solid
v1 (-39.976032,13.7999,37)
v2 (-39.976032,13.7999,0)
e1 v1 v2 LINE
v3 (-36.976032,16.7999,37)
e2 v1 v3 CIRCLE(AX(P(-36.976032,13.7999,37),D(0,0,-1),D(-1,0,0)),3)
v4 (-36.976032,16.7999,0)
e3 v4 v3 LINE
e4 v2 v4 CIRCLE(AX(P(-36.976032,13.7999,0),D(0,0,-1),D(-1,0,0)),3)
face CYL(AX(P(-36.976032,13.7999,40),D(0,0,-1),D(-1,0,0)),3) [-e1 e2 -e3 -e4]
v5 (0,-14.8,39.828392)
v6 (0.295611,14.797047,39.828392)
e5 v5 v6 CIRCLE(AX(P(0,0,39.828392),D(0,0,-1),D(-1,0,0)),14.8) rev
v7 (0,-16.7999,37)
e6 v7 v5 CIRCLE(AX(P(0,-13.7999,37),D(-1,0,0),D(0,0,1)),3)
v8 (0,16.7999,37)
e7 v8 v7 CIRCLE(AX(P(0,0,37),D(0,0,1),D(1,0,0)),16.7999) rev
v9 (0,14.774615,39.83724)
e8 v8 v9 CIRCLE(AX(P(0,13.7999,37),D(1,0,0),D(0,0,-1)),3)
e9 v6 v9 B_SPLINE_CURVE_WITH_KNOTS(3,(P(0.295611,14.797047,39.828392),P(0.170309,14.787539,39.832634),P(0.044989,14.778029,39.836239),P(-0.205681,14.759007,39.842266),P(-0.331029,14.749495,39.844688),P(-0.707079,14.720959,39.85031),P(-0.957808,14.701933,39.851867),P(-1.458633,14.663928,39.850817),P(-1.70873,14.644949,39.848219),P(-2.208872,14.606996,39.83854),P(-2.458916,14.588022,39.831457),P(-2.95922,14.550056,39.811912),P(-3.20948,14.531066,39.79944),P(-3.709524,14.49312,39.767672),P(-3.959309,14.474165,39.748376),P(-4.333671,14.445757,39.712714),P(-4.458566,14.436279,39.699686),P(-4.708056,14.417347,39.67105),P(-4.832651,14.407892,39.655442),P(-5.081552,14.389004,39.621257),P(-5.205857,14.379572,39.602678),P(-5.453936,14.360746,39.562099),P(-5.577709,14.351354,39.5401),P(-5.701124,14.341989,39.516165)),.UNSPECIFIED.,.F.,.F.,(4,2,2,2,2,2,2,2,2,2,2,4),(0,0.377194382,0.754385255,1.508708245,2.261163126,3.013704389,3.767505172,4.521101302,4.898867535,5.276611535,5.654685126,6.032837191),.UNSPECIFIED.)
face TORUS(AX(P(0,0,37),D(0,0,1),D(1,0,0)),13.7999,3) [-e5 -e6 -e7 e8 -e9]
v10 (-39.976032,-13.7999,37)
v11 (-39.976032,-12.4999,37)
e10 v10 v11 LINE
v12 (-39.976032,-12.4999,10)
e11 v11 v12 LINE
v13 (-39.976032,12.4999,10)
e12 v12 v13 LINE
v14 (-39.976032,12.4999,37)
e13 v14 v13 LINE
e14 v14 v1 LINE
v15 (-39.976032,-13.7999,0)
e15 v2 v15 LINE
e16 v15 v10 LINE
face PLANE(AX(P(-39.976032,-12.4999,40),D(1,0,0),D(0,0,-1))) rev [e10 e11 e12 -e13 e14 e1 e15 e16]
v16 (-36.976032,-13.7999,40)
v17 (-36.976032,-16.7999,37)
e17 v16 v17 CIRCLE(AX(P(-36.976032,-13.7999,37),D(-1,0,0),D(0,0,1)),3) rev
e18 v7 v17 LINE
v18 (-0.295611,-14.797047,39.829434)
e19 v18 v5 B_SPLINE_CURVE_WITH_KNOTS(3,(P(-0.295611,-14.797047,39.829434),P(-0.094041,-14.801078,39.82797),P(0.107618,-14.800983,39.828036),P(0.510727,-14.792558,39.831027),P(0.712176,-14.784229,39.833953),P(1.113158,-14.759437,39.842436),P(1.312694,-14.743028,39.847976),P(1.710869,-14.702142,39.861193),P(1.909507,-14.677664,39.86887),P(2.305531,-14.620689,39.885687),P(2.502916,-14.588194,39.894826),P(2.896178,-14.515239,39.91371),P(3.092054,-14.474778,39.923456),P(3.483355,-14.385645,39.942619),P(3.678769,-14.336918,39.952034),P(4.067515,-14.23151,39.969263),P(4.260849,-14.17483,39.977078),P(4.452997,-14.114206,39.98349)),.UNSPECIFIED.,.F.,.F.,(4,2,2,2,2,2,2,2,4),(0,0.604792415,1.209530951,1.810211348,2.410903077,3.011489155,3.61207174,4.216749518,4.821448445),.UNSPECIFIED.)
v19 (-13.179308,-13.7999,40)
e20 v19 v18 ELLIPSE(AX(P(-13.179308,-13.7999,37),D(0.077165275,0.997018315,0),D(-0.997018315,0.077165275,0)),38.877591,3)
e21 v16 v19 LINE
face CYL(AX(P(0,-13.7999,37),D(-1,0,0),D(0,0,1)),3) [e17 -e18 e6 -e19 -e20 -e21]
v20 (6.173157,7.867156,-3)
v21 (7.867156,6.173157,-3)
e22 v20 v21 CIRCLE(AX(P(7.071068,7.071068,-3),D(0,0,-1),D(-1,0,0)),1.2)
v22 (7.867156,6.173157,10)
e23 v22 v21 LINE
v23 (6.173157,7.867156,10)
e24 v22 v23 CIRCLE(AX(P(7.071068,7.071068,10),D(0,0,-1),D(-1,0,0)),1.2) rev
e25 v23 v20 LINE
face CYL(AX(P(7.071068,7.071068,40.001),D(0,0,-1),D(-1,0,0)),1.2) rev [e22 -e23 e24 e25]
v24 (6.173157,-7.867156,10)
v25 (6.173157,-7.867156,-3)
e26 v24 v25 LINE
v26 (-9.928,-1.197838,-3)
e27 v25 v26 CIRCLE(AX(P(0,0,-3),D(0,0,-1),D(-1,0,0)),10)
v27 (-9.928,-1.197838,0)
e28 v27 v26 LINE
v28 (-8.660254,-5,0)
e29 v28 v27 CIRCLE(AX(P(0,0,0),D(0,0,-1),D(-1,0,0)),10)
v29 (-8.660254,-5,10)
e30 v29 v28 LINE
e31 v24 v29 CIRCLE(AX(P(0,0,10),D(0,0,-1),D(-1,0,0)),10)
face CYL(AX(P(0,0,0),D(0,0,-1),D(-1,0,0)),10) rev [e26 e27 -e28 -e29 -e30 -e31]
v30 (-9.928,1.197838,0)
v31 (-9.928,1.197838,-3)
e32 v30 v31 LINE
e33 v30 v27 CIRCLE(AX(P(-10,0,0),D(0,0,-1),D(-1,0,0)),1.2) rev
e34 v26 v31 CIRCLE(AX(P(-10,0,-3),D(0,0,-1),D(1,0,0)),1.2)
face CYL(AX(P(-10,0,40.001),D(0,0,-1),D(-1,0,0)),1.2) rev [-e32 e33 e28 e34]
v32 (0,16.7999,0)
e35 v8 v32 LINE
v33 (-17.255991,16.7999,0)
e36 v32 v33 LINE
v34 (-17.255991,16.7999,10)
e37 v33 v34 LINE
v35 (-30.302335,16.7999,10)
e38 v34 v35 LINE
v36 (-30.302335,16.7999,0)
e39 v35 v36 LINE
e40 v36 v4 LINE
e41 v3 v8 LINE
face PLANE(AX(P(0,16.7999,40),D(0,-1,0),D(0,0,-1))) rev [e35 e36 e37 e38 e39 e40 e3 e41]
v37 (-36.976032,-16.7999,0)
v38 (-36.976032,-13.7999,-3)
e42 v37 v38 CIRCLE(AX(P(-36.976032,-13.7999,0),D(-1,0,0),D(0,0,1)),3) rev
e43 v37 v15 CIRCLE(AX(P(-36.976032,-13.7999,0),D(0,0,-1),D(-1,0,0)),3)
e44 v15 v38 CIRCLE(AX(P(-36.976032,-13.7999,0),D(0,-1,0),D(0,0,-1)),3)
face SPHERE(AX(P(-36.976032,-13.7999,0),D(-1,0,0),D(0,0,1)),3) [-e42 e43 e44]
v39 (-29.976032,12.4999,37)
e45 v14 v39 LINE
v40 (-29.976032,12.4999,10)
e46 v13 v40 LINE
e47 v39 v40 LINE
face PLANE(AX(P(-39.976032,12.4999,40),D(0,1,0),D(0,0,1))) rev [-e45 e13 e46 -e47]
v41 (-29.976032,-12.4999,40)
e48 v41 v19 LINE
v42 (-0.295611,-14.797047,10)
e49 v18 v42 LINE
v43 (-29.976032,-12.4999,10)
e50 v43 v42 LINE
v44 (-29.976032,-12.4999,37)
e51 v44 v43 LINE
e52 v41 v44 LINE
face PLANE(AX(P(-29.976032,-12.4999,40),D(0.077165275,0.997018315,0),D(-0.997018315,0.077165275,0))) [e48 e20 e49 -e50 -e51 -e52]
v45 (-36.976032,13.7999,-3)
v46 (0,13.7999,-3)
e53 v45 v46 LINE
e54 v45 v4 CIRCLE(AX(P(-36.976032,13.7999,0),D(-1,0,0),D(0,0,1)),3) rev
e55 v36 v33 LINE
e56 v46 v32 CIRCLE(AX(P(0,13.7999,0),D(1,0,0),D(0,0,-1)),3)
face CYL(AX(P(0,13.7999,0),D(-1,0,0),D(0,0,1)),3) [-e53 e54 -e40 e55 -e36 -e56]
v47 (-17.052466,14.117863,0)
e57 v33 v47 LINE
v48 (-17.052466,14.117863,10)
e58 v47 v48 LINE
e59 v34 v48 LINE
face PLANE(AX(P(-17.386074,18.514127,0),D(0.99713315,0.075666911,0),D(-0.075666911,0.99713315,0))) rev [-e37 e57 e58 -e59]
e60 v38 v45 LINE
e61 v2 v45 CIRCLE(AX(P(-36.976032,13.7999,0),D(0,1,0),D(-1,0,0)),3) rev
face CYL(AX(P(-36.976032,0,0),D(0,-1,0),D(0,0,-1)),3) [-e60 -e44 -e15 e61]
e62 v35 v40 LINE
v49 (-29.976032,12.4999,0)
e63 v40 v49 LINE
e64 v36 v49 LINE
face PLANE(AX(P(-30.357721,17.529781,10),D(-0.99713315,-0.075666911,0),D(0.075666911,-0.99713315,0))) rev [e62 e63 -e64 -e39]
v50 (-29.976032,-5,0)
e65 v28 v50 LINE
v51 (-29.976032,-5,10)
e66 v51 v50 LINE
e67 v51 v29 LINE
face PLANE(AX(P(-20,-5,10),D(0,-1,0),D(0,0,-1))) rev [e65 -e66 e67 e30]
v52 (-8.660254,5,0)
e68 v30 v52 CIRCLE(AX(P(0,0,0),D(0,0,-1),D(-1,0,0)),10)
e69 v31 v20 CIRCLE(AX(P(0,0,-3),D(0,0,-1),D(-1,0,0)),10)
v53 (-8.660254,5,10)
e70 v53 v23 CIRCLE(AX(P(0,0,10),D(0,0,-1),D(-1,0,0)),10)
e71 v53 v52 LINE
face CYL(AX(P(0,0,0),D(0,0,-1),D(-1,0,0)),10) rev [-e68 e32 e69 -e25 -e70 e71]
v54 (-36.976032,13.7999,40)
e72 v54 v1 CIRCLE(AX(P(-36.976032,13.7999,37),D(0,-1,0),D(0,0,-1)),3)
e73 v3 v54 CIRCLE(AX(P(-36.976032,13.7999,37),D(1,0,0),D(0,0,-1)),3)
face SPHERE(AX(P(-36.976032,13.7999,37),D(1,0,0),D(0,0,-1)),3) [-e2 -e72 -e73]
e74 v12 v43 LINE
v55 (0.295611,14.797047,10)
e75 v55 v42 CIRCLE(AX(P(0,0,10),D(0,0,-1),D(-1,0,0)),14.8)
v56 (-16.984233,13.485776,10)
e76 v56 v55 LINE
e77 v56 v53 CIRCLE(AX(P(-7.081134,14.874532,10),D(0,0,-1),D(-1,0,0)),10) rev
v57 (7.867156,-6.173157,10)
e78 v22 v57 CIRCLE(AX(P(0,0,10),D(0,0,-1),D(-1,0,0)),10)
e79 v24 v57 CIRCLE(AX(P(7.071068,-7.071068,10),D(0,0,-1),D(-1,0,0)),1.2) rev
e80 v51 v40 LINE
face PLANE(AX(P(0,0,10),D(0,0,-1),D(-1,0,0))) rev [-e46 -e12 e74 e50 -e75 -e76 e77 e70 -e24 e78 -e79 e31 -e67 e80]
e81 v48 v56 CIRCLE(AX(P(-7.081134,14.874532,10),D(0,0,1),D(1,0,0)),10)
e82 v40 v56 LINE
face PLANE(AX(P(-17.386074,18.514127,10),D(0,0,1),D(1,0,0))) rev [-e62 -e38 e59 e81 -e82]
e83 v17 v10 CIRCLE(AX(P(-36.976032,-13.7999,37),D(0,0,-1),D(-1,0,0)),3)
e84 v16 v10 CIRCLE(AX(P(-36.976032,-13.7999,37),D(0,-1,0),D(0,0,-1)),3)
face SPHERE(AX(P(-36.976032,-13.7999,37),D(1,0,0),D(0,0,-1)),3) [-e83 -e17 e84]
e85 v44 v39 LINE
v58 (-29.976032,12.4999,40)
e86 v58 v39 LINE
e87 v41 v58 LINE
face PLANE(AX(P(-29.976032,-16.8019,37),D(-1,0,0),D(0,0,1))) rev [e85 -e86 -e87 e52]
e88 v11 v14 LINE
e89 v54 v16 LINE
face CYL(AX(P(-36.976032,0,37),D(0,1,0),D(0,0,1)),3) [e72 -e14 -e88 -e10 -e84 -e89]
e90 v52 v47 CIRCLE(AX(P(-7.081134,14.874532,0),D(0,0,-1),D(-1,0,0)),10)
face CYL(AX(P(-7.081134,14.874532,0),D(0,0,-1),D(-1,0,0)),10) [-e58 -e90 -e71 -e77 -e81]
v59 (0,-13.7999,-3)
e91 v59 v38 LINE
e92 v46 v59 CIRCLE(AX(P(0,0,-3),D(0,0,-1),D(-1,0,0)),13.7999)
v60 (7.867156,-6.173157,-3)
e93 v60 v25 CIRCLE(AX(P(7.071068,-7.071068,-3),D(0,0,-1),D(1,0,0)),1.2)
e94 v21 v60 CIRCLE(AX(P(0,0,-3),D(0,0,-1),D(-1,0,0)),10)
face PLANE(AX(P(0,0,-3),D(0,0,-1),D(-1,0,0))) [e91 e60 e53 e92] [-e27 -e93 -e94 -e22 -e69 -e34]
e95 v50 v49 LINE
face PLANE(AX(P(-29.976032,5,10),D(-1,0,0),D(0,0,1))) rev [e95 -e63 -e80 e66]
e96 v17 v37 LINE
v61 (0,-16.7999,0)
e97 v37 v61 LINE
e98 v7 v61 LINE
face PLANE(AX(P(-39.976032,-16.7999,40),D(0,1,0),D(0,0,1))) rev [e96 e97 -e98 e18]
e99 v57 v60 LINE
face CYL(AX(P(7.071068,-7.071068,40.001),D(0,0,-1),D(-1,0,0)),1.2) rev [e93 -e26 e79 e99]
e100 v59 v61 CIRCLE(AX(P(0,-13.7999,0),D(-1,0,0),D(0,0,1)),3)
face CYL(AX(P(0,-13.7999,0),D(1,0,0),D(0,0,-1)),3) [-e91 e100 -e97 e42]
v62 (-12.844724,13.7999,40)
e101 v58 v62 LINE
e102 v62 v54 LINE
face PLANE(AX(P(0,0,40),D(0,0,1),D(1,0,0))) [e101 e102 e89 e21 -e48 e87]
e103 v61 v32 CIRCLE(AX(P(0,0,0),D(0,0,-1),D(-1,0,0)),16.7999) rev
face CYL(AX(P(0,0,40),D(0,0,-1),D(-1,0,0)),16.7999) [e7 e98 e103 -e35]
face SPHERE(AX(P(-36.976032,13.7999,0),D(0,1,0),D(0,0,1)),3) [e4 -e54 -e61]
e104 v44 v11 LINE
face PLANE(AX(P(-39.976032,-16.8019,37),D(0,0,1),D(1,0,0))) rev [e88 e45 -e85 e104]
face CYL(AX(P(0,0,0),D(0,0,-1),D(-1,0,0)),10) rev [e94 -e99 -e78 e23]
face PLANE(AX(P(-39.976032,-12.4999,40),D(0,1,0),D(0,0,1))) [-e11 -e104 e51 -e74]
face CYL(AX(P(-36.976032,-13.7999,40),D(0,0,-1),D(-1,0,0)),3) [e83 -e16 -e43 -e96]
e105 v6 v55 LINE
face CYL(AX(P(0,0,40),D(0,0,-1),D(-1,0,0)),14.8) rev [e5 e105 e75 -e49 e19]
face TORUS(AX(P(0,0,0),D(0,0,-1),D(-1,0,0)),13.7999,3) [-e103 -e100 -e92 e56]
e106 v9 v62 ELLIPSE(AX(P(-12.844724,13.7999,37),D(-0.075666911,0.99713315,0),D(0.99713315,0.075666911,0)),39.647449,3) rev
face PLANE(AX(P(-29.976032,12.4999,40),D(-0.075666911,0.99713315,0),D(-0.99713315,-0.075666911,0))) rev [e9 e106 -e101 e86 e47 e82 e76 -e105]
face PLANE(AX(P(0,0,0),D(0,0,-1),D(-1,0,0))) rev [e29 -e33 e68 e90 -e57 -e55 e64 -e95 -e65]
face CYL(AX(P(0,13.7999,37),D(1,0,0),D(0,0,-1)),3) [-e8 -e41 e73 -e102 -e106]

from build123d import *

# Parameters (mm, degrees)
EXTRUDE_9_DEPTH      = 40
EXTRUDE_START        = 3
EXTRUDE_10_DEPTH     = 3
SKETCH_11_R          = 10
CUT_EXTRUDE_1_DEPTH  = 3
EXTRUDE_11_DEPTH     = 10
SKETCH_21_W          = 13.008941923
SKETCH_21_H          = 10
CUT_EXTRUDE_9_DEPTH  = 65.045413014
EXTRUDE_12_REACH     = 65.691
SKETCH_23_W          = 10
SKETCH_23_H          = 3
FILLET_1_R           = 3
FILLET_2_R           = 3
FILLET_3_DEPTH       = 10
CUT_EXTRUDE_10_REACH = 63.068


with BuildPart() as part:
    # 草图5 → 凸台-拉伸9 (new body)
    with BuildSketch(Plane.XY):
        with BuildLine():
            Line((0, 16.799900253), (-39.976031579, 16.799900253))
            Line((-39.976031579, 16.799900253), (-39.976031579, 12.499900253))
            Line((-39.976031579, 12.499900253), (-29.976031579, 12.499900253))
            Line((-29.976031579, 12.499900253), (0.295610531, 14.79704749))
            ThreePointArc((0.295610531, 14.79704749), (14.79704749, -0.295610531), (-0.295610531, -14.79704749))
            Line((-0.295610531, -14.79704749), (-29.976031579, -12.499900253))
            Line((-29.976031579, -12.499900253), (-39.976031579, -12.499900253))
            Line((-39.976031579, -12.499900253), (-39.976031579, -16.799900253))
            Line((-39.976031579, -16.799900253), (0, -16.799900253))
            ThreePointArc((0, -16.799900253), (16.799900253, 0), (0, 16.799900253))
        make_face()
    extrude(amount=EXTRUDE_9_DEPTH)

    # 草图10 → 凸台-拉伸10 (add)
    with BuildSketch(Plane(origin=(0, 0, 0), x_dir=(-1, 0, 0), z_dir=(0, 0, -1)).offset(EXTRUDE_START)):
        with BuildLine():
            Line((0, -16.799900253), (39.976031579, -16.799900253))
            Line((39.976031579, -16.799900253), (39.976031579, 16.799900253))
            Line((39.976031579, 16.799900253), (0, 16.799900253))
            ThreePointArc((0, 16.799900253), (-16.799900253, 0), (0, -16.799900253))
        make_face()
    extrude(amount=-EXTRUDE_10_DEPTH)

    # 草图11 → 切除-拉伸1 (cut)
    with BuildSketch(Plane(origin=(0, 0, -3), x_dir=(-1, 0, 0), z_dir=(0, 0, -1))):
        Circle(SKETCH_11_R)
    extrude(amount=-CUT_EXTRUDE_1_DEPTH, mode=Mode.SUBTRACT)

    # 草图18 → 凸台-拉伸11 (add)
    with BuildSketch(Plane.XY):
        with BuildLine():
            Line((-39.976031579, -12.499900253), (-29.976031579, -12.499900253))
            Line((-29.976031579, -12.499900253), (-20.032968003, -13.26945406))
            Line((-20.032968003, -13.26945406), (-0.295610531, -14.79704749))
            ThreePointArc((-0.295610531, -14.79704749), (14.79704749, -0.295610531), (0.295610531, 14.79704749))
            Line((0.295610531, 14.79704749), (-17.004384343, 13.484246708))
            Line((-17.004384343, 13.484246708), (-17.004384343, 5))
            Line((-17.004384343, 5), (-8.660254038, 5))
            ThreePointArc((-8.660254038, 5), (10, 0), (-8.660254038, -5))
            Line((-8.660254038, -5), (-20, -5))
            Line((-20, -5), (-29.976031579, -5))
            Line((-29.976031579, -5), (-29.976031579, 5))
            Line((-29.976031579, 5), (-29.976031579, 12.499900253))
            Line((-29.976031579, 12.499900253), (-39.976031579, 12.499900253))
            Line((-39.976031579, 12.499900253), (-39.976031579, -12.499900253))
        make_face()
    extrude(amount=EXTRUDE_11_DEPTH)

    # 草图21 → 切除-拉伸9 (cut, through all)
    with BuildSketch(Plane(origin=(-1.114744508, 14.690023458, 0), x_dir=(0.9971331498487674, 0.07566691134621262, 0), z_dir=(0.07566691134621262, -0.9971331498487674, 0))):
        with Locations((-22.439794983, 5)):
            Rectangle(SKETCH_21_W, SKETCH_21_H)
    extrude(amount=-CUT_EXTRUDE_9_DEPTH, mode=Mode.SUBTRACT)

    # 草图23 → 凸台-拉伸12 (add, up to next)
    with BuildSketch(Plane.XZ.offset(-12.499900253), mode=Mode.PRIVATE) as extrude_12_sk1:
        with Locations((-34.976031579, 38.5)):
            Rectangle(SKETCH_23_W, SKETCH_23_H)
    extrude_12_tool1 = extrude(extrude_12_sk1.sketch, amount=EXTRUDE_12_REACH, mode=Mode.PRIVATE) - part.part
    add(extrude_12_tool1.solids().sort_by_distance((-34.976032, 12.4999, 38.5))[0])

    # 圆角1
    # the kernel refuses this fillet: 3 mm, written as the material it takes off along each edge
    with BuildSketch(Plane(origin=(-47.476031579, -16.799900253, 40), x_dir=(0, 0, -1), z_dir=(1, 0, 0)), Plane(origin=(0, 16.799900253, 40), x_dir=(0, 0, -1), z_dir=(-1, 0, 0))) as fillet_1_piece_1:
        with BuildLine():
            CenterArc((FILLET_1_R, FILLET_1_R), FILLET_1_R, 180, 90)
            Line((0, FILLET_1_R), (0, 0))
            Line((0, 0), (FILLET_1_R, 0))
        make_face()
    extrude(amount=47.476031579, mode=Mode.SUBTRACT)
    with BuildSketch(Plane(origin=(0, 0, 40), x_dir=(0, -1, 0), z_dir=(-1, 0, 0))) as fillet_1_piece_2:
        with BuildLine():
            CenterArc((16.799900253 - FILLET_1_R, -FILLET_1_R), FILLET_1_R, 0, 90)
            Line((16.799900253, -FILLET_1_R), (16.799900253, 0))
            Line((16.799900253, 0), (16.799900253 - FILLET_1_R, 0))
        make_face()
    revolve(axis=Axis((0, 0, 40), (0, 0, 1)), revolution_arc=180, mode=Mode.SUBTRACT)

    # 圆角2
    fillet_2_edges = [part.edges().sort_by_distance(p)[0] for p in [
        (-39.976031579, 0, 40),
        (-39.976031579, -16.799900253, 17),
        (-39.976031579, 16.799900253, 17),
        (-39.976031579, 15.921220597, 39.121320344),
        (-39.976031579, -15.921220597, 39.121320344),
        (16.799900253, 0, -3),
        (-19.988015789, -16.799900253, -3),
        (-39.976031579, 0, -3),
        (-19.988015789, 16.799900253, -3),
    ]]
    fillet(fillet_2_edges, radius=FILLET_2_R - 0.0001)  # a hair under: the kernel refuses the full size

    # 圆角3: read off the stored shape, not the designer's step
    # 圆角3 outline → 圆角3 (cut)
    with BuildSketch(Plane.XY):
        with BuildLine():
            Line((-17.004384343, 5), (-8.660254038, 5))
            ThreePointArc((-8.660254038, 5), (-14.43892528, 8.102315607), (-17.052465962, 14.117862844))
            Line((-17.052465962, 14.117862844), (-17.004384343, 13.484246708))
            Line((-17.004384343, 13.484246708), (-17.004384343, 5))
        make_face()
    extrude(amount=FILLET_3_DEPTH, mode=Mode.SUBTRACT)

    # 草图27 → 切除-拉伸10 (cut, up to next)
    with BuildSketch(Plane(origin=(0, 0, -3), x_dir=(-1, 0, 0), z_dir=(0, 0, -1)), mode=Mode.PRIVATE) as cut_extrude_10_sk1:
        with BuildLine():
            ThreePointArc((9.928, -1.197838052), (10, 0), (9.928, 1.197838052))
            ThreePointArc((9.928, 1.197838052), (11.2, 0), (9.928, -1.197838052))
        make_face()
    cut_extrude_10_tool1 = extrude(cut_extrude_10_sk1.sketch, amount=-CUT_EXTRUDE_10_REACH, mode=Mode.PRIVATE) & part.part
    # 草图27 → 切除-拉伸10 (cut, up to next)
    with BuildSketch(Plane(origin=(0, 0, -3), x_dir=(-1, 0, 0), z_dir=(0, 0, -1)), mode=Mode.PRIVATE) as cut_extrude_10_sk2:
        with BuildLine():
            ThreePointArc((-6.173156714, -7.867155533), (-7.919595949, -7.919595949), (-7.867155533, -6.173156714))
            ThreePointArc((-7.867155533, -6.173156714), (-7.071067812, -7.071067812), (-6.173156714, -7.867155533))
        make_face()
    cut_extrude_10_tool2 = extrude(cut_extrude_10_sk2.sketch, amount=-CUT_EXTRUDE_10_REACH, mode=Mode.PRIVATE) & part.part
    # 草图27 → 切除-拉伸10 (cut, up to next)
    with BuildSketch(Plane(origin=(0, 0, -3), x_dir=(-1, 0, 0), z_dir=(0, 0, -1)), mode=Mode.PRIVATE) as cut_extrude_10_sk3:
        with BuildLine():
            ThreePointArc((-7.867155533, 6.173156714), (-7.071067812, 7.071067812), (-6.173156714, 7.867155533))
            ThreePointArc((-6.173156714, 7.867155533), (-7.919595949, 7.919595949), (-7.867155533, 6.173156714))
        make_face()
    cut_extrude_10_tool3 = extrude(cut_extrude_10_sk3.sketch, amount=-CUT_EXTRUDE_10_REACH, mode=Mode.PRIVATE) & part.part
    add(cut_extrude_10_tool1.solids().sort_by_distance((-10.496108, 0, -3))[0], mode=Mode.SUBTRACT)
    add(cut_extrude_10_tool2.solids().sort_by_distance((7.421869, -7.421869, -3))[0], mode=Mode.SUBTRACT)
    add(cut_extrude_10_tool3.solids().sort_by_distance((7.421869, 7.421869, -3))[0], mode=Mode.SUBTRACT)


solid = part.part
